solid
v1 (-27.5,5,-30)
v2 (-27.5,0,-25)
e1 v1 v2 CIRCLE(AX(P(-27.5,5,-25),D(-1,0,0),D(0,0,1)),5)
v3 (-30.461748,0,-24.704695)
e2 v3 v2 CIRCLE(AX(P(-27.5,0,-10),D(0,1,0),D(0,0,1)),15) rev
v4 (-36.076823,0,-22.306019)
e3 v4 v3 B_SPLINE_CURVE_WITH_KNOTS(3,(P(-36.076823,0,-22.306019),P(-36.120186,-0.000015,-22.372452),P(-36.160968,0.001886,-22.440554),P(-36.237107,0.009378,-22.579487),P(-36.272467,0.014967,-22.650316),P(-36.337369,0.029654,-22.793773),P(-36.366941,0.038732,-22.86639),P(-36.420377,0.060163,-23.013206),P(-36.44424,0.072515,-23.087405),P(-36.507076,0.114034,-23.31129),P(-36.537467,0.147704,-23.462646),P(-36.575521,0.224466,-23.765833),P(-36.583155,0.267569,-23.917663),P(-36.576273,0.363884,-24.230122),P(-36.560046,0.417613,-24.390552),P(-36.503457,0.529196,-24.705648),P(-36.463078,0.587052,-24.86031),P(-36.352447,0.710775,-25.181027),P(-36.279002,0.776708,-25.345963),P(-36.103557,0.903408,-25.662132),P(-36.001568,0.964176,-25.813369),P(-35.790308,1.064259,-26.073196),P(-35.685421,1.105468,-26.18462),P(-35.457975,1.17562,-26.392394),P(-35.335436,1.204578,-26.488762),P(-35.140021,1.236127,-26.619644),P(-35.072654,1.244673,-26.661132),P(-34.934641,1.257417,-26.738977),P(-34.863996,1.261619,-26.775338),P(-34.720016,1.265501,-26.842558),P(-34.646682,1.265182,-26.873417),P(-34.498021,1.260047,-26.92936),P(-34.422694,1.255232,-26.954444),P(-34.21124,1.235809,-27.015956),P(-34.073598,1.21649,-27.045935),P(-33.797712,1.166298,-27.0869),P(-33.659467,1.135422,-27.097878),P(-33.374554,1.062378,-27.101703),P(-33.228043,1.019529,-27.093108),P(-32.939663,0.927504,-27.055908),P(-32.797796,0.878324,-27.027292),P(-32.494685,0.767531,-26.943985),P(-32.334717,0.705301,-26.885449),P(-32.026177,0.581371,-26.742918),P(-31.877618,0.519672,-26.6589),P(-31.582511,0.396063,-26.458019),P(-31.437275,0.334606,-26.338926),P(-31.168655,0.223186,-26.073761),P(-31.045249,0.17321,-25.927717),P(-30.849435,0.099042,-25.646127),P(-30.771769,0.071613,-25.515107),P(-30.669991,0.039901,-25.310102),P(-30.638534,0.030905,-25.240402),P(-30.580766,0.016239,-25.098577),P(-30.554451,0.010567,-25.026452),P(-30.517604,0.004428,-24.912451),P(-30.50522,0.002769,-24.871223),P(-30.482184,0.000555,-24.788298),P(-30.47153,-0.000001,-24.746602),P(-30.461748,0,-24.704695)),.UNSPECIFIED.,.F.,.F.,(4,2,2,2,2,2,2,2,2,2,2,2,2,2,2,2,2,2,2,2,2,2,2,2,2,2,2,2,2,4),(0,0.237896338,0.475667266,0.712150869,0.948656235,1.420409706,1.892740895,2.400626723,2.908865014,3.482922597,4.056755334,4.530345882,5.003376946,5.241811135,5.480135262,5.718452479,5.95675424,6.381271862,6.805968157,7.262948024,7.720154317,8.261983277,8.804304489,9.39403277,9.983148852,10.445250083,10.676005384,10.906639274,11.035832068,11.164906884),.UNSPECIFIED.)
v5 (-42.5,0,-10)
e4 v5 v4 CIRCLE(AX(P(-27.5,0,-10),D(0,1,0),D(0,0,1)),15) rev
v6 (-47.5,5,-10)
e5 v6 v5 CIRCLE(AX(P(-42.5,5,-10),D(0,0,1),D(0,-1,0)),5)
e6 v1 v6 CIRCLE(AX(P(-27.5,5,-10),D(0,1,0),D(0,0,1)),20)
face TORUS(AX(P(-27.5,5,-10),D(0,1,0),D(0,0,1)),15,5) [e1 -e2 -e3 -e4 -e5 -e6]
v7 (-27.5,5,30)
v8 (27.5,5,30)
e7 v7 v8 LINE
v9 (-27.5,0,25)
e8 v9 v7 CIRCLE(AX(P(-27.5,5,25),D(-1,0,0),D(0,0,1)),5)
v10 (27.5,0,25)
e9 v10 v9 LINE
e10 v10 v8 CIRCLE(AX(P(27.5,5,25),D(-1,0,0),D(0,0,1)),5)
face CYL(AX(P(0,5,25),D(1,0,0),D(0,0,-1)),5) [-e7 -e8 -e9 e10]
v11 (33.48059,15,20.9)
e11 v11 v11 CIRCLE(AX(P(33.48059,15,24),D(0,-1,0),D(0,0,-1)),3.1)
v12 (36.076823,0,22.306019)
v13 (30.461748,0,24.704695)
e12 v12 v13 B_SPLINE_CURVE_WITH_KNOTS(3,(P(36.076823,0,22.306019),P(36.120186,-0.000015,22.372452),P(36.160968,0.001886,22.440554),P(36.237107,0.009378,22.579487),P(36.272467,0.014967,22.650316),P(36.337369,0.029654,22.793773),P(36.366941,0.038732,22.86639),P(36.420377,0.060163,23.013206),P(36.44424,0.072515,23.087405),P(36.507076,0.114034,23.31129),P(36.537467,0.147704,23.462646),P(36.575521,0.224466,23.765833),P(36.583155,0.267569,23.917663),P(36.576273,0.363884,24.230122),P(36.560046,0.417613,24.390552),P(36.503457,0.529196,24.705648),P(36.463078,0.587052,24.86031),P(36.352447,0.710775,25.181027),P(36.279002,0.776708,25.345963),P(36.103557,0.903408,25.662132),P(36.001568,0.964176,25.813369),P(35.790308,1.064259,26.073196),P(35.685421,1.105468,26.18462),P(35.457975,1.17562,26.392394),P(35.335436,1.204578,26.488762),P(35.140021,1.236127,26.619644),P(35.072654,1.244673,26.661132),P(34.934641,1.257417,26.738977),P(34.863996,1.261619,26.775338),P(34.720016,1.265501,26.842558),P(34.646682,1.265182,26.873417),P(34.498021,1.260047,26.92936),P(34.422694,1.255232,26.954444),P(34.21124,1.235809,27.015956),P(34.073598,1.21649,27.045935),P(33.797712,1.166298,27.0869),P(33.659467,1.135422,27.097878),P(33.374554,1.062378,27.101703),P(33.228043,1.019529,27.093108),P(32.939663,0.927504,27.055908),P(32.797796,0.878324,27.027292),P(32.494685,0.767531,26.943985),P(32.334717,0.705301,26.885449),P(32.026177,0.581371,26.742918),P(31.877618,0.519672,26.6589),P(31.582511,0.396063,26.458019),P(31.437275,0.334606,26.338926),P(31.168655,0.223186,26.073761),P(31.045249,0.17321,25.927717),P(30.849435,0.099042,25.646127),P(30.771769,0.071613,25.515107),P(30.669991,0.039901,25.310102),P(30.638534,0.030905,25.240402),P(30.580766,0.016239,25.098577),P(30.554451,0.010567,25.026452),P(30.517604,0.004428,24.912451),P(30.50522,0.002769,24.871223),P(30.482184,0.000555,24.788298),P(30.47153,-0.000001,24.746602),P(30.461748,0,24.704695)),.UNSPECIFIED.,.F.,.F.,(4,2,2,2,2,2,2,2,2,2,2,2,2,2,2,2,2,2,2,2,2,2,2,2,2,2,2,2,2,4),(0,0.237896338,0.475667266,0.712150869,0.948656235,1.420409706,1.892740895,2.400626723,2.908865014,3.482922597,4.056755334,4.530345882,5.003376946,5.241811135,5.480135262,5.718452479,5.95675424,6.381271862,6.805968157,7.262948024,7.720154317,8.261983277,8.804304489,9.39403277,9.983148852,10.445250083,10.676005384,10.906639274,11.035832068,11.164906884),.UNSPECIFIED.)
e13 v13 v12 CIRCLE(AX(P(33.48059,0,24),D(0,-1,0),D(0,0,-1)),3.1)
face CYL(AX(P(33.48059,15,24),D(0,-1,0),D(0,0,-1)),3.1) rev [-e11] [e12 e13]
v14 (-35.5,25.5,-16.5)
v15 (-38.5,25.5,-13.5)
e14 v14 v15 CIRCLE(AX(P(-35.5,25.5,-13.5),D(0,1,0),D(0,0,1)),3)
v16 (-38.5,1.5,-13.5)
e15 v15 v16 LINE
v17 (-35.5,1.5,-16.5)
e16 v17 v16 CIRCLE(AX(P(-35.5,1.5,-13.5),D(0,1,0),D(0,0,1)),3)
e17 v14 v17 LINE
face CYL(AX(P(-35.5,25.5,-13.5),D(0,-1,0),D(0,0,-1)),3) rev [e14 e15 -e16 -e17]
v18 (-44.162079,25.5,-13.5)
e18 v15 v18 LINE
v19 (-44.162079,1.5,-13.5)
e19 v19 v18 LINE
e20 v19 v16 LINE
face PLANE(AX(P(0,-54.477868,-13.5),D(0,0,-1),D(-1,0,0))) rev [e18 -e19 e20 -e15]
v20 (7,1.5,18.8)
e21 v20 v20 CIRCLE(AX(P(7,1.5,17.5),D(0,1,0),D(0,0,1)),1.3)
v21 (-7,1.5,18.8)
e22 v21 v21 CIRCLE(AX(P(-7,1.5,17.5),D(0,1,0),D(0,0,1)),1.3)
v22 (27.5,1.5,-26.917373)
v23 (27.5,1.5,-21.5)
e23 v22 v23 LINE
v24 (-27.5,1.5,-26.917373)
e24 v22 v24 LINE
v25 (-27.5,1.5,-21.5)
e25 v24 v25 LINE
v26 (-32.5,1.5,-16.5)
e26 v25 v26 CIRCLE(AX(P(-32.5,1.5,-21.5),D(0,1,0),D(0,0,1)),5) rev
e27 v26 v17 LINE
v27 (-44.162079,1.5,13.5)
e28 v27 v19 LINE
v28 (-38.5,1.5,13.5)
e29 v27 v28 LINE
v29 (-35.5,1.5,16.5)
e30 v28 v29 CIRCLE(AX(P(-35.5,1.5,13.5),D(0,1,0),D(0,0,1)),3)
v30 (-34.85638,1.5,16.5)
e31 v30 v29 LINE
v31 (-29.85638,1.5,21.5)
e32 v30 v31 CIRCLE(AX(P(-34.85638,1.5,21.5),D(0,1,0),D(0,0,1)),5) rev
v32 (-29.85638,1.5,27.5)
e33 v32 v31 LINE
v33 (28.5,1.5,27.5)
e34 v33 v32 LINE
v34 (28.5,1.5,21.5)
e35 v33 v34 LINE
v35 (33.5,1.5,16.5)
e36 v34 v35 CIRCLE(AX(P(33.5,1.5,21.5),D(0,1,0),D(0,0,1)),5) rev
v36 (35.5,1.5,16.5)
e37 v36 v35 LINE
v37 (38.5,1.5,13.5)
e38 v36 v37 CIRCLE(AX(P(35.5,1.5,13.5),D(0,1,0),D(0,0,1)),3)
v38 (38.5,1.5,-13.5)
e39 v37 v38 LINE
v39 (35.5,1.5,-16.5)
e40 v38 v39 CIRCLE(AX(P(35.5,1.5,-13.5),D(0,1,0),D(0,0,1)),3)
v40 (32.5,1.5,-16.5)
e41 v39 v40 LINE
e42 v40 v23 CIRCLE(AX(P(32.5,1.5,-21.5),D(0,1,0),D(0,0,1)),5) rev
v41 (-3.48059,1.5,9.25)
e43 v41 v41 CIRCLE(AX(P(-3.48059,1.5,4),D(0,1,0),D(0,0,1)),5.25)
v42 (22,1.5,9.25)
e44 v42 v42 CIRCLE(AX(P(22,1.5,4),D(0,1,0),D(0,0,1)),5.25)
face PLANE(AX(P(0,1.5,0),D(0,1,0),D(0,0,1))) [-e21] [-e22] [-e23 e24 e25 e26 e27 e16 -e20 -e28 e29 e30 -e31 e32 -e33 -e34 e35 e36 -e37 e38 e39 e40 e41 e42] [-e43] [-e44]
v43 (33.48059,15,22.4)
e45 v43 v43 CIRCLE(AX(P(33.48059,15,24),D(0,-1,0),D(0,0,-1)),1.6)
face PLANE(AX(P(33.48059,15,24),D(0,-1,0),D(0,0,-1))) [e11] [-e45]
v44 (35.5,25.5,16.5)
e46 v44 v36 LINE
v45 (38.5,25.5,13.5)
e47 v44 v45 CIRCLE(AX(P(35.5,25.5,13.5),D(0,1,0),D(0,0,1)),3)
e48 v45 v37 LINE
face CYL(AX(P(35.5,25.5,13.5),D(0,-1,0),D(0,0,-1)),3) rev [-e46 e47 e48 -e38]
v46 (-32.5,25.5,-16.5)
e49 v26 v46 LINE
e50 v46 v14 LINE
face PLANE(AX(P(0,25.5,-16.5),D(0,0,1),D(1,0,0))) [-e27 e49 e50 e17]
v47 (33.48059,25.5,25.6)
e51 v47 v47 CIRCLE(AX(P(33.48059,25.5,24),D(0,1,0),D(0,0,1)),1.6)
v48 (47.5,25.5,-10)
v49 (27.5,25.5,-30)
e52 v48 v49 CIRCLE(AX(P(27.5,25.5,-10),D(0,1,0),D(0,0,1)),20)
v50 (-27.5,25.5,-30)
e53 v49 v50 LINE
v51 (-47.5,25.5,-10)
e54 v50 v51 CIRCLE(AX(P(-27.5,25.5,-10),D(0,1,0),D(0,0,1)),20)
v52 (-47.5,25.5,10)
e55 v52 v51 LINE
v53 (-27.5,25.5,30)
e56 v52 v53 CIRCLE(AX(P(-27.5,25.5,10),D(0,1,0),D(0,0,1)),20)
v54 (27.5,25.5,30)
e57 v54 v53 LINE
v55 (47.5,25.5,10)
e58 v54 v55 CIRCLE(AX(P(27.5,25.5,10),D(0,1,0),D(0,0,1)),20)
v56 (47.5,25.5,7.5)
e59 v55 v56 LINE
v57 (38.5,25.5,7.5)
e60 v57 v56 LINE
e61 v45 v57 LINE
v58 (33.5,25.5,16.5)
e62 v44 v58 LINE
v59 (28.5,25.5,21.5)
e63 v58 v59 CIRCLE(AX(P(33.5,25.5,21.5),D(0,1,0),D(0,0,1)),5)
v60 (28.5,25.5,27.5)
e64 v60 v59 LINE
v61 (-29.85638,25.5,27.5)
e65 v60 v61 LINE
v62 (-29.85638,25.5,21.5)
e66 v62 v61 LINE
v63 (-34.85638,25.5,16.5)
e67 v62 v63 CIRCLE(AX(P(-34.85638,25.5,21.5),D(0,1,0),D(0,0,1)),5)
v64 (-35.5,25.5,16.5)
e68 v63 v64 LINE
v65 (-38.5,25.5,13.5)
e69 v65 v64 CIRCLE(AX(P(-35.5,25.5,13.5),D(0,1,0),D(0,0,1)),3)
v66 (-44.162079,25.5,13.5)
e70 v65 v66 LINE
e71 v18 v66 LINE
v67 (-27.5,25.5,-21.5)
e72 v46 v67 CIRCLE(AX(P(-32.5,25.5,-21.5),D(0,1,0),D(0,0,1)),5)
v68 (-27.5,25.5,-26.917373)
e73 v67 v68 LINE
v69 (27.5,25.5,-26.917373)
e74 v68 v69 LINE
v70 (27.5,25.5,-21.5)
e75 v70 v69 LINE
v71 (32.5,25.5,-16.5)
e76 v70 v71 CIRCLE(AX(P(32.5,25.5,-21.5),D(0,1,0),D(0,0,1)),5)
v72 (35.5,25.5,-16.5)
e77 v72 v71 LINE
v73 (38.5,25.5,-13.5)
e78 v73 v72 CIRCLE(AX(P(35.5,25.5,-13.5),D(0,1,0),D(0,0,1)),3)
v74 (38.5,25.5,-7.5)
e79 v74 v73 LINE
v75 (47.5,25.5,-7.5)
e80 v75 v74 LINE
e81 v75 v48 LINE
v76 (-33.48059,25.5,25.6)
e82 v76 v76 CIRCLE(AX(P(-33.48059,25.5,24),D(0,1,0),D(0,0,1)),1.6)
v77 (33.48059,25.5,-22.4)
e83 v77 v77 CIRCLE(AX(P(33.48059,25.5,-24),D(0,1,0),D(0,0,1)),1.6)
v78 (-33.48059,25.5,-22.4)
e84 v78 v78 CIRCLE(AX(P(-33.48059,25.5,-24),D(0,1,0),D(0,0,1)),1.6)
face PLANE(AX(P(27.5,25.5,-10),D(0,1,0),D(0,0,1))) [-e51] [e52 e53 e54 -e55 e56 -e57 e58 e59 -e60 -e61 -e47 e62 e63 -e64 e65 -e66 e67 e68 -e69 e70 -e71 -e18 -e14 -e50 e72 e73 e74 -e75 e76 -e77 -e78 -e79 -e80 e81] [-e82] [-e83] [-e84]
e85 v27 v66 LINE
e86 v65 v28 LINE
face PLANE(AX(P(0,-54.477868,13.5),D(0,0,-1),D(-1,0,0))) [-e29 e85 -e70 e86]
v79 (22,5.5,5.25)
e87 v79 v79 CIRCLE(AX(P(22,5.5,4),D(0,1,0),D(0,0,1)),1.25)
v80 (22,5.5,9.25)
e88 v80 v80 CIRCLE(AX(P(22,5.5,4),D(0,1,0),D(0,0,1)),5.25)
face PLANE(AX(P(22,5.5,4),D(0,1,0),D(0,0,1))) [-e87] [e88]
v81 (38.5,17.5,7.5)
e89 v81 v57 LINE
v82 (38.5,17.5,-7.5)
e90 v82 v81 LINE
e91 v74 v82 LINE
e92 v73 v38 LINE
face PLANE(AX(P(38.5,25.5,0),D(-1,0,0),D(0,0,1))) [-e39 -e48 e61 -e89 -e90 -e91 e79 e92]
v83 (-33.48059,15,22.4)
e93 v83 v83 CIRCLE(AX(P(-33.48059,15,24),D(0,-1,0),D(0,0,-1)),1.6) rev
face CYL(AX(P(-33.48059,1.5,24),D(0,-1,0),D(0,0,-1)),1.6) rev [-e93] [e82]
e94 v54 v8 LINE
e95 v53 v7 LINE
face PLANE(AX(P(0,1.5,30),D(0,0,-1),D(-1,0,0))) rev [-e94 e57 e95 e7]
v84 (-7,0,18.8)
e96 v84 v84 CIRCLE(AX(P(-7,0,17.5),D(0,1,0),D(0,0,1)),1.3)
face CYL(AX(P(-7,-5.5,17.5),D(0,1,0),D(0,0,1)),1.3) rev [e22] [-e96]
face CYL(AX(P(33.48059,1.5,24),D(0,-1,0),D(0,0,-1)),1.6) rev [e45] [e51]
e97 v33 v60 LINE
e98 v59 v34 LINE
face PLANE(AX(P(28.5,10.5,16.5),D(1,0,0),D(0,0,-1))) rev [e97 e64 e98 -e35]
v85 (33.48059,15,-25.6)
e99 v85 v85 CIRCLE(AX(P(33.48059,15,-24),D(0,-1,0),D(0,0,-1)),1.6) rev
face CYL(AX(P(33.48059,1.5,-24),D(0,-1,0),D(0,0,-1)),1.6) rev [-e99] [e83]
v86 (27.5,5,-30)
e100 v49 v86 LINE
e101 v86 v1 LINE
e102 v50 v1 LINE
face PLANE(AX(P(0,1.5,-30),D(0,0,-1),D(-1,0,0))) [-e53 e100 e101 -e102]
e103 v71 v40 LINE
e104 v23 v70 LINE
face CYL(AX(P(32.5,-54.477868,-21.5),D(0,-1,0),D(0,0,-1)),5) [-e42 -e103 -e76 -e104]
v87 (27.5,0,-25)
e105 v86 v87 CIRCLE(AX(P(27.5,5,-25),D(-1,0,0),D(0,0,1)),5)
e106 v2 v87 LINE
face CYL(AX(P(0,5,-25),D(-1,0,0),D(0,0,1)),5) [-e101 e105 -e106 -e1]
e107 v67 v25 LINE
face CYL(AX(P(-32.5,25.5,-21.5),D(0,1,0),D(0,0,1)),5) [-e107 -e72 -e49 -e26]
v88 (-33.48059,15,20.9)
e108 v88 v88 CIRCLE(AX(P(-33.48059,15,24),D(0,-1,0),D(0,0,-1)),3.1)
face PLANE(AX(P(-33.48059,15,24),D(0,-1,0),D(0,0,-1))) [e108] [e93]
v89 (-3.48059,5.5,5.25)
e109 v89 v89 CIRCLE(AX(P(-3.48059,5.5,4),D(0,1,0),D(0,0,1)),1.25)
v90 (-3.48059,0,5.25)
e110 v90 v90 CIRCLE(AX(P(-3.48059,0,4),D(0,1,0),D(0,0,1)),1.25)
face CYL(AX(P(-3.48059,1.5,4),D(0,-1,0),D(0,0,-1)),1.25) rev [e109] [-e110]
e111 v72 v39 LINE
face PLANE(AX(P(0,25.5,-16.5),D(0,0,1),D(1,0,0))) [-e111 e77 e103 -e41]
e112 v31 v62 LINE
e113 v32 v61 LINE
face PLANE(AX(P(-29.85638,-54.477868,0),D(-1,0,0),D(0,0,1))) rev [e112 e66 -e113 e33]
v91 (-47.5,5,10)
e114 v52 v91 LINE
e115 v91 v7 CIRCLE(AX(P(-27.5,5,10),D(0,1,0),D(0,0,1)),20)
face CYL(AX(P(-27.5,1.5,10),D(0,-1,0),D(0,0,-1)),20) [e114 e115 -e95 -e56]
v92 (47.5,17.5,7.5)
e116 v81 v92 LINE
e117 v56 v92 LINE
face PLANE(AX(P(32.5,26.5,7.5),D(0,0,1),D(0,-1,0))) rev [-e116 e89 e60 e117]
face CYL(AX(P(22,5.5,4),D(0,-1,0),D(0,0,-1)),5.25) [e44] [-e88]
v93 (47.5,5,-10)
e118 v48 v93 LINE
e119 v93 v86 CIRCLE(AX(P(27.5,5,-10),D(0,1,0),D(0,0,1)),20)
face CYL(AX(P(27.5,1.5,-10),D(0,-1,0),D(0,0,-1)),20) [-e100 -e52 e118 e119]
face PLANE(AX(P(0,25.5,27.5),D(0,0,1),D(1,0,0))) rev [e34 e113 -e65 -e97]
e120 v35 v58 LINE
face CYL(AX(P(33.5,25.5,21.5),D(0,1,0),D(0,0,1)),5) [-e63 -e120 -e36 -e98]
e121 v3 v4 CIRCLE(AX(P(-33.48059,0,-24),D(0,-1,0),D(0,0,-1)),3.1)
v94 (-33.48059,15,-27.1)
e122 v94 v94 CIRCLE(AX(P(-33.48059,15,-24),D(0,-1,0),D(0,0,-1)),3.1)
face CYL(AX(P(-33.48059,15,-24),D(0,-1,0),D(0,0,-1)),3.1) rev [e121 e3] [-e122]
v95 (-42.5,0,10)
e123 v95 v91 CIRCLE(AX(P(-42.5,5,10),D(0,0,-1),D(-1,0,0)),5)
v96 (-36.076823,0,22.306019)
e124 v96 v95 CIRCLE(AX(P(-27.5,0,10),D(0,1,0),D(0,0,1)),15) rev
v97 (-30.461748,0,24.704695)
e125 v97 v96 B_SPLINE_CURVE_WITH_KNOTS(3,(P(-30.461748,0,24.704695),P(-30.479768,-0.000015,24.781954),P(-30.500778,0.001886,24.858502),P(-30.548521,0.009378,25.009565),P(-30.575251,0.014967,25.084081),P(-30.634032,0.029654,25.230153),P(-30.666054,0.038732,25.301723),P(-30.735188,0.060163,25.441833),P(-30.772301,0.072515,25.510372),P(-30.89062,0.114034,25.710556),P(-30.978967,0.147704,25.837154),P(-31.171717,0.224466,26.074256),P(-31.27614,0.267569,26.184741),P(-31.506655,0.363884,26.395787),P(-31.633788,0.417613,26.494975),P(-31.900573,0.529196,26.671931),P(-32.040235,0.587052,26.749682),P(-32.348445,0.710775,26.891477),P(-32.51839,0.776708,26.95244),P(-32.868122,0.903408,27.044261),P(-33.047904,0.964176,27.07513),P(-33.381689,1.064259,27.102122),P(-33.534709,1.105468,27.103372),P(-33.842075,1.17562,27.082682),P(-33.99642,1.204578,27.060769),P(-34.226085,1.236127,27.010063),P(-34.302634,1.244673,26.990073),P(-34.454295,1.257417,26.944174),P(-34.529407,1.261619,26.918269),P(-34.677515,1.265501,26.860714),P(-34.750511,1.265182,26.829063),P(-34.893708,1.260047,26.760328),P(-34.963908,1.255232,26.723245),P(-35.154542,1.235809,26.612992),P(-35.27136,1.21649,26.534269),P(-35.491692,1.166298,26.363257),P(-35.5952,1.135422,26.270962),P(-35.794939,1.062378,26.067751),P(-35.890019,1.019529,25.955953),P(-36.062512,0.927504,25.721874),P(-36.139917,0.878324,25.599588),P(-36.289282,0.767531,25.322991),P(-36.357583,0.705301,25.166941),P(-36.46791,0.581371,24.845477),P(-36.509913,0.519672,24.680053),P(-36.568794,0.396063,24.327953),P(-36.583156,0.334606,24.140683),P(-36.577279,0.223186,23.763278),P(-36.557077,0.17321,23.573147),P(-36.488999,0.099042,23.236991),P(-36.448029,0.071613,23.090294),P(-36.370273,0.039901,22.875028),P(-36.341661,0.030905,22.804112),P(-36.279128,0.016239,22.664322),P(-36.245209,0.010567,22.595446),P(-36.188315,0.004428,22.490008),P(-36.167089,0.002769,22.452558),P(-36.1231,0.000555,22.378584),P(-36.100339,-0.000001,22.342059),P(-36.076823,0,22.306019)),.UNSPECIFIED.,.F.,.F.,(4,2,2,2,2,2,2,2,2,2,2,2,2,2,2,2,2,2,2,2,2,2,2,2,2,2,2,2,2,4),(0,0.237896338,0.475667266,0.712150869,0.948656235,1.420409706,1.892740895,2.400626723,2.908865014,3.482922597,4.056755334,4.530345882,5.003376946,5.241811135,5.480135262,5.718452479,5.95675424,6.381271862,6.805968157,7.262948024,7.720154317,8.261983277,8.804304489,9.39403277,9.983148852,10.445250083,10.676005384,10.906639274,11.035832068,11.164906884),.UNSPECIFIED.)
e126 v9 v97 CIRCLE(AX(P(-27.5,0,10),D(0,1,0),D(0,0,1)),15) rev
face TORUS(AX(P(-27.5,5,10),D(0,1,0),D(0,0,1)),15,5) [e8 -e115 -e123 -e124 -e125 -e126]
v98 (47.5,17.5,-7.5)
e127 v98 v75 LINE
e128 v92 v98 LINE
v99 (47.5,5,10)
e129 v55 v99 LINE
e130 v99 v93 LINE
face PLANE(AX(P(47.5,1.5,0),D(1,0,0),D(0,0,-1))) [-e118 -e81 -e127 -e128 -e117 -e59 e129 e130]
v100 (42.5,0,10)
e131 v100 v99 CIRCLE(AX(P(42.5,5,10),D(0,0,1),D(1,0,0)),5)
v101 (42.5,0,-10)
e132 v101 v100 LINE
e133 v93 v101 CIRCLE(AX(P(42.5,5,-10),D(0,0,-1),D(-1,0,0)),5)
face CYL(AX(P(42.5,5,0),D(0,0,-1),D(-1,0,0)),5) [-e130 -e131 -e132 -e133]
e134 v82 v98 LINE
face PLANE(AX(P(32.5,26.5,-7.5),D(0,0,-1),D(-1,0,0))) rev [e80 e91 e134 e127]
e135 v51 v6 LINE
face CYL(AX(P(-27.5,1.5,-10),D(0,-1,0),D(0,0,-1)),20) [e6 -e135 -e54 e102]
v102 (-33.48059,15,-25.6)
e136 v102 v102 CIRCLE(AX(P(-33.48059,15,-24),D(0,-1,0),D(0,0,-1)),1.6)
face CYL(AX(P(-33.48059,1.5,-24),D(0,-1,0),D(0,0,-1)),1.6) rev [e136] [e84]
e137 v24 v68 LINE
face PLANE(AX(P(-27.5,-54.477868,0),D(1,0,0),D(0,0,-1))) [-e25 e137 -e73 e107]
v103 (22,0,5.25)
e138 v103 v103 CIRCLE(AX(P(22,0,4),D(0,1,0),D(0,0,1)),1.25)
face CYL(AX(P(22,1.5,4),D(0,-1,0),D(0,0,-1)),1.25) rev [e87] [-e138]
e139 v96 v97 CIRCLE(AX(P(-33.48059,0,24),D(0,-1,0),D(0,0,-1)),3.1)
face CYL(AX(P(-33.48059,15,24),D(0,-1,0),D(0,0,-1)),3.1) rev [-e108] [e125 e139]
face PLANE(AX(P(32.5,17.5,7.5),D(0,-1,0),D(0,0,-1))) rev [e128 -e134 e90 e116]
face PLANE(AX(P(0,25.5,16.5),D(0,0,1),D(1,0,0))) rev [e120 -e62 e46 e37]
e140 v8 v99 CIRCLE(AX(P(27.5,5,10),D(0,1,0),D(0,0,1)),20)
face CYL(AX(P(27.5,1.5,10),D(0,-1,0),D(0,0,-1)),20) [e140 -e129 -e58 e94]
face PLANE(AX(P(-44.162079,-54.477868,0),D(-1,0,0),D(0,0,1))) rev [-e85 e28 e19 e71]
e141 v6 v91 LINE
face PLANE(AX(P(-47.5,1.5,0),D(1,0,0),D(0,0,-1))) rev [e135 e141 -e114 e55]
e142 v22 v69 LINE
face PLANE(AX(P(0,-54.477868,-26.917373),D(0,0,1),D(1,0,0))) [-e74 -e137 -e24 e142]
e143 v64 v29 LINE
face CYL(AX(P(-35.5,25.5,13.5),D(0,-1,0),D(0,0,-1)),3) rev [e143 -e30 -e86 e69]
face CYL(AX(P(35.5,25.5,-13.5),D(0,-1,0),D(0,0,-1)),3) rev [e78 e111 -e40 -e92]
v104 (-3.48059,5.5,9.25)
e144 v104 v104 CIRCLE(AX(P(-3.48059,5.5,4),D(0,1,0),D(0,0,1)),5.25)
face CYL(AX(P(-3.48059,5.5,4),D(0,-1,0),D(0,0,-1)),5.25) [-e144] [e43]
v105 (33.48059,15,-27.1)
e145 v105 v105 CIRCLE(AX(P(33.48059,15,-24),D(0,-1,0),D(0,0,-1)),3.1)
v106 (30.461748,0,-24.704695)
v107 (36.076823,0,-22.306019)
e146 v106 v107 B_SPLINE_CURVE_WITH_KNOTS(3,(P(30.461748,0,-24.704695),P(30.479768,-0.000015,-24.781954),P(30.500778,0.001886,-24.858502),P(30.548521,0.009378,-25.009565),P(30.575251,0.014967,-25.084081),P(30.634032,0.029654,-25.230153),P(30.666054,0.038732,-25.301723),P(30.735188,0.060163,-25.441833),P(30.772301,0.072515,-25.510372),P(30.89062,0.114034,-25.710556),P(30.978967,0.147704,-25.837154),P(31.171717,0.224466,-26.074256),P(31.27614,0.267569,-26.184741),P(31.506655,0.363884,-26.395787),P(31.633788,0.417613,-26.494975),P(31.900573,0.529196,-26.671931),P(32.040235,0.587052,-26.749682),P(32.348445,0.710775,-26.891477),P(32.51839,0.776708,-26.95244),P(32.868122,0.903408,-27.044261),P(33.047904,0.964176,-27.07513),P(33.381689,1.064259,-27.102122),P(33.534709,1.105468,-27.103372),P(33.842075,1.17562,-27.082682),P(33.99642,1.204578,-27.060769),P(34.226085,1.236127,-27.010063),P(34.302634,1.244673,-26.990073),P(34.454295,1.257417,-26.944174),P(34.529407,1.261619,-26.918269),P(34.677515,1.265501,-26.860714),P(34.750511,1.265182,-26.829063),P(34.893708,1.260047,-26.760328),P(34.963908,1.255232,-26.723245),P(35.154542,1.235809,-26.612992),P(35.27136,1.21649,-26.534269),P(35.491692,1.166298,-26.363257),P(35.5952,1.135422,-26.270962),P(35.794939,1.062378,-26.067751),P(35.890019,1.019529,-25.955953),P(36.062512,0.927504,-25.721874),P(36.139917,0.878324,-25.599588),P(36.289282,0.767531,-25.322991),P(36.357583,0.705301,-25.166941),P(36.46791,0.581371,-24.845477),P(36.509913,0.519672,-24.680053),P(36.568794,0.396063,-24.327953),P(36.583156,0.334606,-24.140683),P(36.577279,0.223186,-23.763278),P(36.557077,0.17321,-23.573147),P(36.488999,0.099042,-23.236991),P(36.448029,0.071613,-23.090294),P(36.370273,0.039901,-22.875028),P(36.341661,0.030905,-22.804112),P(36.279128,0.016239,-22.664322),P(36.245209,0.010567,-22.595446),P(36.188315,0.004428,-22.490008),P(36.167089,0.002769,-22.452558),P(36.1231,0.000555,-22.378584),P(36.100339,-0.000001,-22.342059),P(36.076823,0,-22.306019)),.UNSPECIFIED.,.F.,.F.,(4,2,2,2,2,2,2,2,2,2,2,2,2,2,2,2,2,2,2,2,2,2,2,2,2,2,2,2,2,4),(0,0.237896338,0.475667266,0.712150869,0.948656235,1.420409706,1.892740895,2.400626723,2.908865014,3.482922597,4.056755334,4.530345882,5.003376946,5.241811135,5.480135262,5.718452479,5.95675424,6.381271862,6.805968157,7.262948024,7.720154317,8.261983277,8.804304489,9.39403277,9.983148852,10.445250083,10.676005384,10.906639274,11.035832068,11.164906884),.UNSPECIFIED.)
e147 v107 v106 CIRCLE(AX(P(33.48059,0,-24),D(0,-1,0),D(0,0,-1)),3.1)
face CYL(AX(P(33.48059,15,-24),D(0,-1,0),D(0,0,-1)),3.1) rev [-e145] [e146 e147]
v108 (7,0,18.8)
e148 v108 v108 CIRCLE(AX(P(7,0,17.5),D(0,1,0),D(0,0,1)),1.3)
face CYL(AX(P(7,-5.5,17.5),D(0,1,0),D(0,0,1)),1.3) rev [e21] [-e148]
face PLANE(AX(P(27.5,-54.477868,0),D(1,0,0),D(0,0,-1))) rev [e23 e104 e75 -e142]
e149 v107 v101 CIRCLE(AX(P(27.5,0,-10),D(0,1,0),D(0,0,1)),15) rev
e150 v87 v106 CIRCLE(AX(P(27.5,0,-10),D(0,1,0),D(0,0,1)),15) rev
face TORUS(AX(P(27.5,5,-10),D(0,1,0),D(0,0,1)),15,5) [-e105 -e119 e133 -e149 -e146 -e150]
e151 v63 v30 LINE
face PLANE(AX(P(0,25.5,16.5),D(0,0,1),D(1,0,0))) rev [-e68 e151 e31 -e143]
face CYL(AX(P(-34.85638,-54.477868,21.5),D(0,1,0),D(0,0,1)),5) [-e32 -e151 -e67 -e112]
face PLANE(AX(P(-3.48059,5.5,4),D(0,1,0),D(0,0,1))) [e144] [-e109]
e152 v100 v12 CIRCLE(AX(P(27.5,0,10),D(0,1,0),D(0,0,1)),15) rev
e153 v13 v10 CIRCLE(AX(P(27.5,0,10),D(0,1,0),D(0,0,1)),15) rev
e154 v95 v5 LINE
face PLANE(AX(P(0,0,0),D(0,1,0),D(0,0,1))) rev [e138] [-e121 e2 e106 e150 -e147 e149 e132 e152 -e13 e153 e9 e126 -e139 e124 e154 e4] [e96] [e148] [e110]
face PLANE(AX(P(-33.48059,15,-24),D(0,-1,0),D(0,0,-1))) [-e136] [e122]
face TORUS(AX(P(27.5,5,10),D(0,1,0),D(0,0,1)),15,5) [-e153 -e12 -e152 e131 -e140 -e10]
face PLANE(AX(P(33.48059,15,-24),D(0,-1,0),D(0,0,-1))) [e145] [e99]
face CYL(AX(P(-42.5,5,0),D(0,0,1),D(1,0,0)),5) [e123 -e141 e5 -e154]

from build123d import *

# Parameters (mm, degrees)
SKETCH2_R           = 1.6
SKETCH2_W           = 24
SKETCH2_H           = 11
SKETCH2_H_2         = 3
SKETCH2_R_2         = 1.25
BOSS_EXTRUDE1_DEPTH = 1.5
BOSS_EXTRUDE2_START = 1.5
SKETCH2_3_R         = 1.6
BOSS_EXTRUDE2_DEPTH = 24
SKETCH3_R           = 5.25
SKETCH3_R_2         = 1.25
BOSS_EXTRUDE3_DEPTH = 4
FILLET1_R           = 10
SKETCH4_R           = 1.3
CUT_EXTRUDE1_DEPTH  = 7
SKETCH5_R           = 3.1
CUT_EXTRUDE2_DEPTH  = 15
FILLET2_R           = 5
SKETCH6_W           = 15
SKETCH6_H           = 9
CUT_EXTRUDE3_DEPTH  = 15
SKETCH7_W           = 12
SKETCH7_H           = 6
CUT_EXTRUDE4_DEPTH  = 15
SKETCH10_W          = 5.662079196
SKETCH10_H          = 27
SKETCH10_W_2        = 55
SKETCH10_H_2        = 10.417373492
CUT_EXTRUDE5_DEPTH  = 24
FILLET6_R           = 5


with BuildPart() as part:
    # Sketch2 → Boss-Extrude1 (new body)
    # profile 1 of 4: a face of its own
    with BuildSketch(Plane(origin=(0, 0, 0), x_dir=(1, 0, 0), z_dir=(0, 1, 0))):
        with BuildLine():
            Line((27.5, 30), (-27.5, 30))
            ThreePointArc((-27.5, 30), (-41.642135624, 24.142135624), (-47.5, 10))
            Line((-47.5, 10), (-47.5, -10))
            ThreePointArc((-47.5, -10), (-41.642135624, -24.142135624), (-27.5, -30))
            Line((-27.5, -30), (27.5, -30))
            ThreePointArc((27.5, -30), (41.642135624, -24.142135624), (47.5, -10))
            Line((47.5, -10), (47.5, 10))
            ThreePointArc((47.5, 10), (41.642135624, 24.142135624), (27.5, 30))
        make_face()
        with Locations(Location((-33.480589606, -24, 0), (0, 0, 270))):
            Circle(SKETCH2_R, mode=Mode.SUBTRACT)
        with Locations(Location((33.480589606, -24, 0), (0, 0, 270))):
            Circle(SKETCH2_R, mode=Mode.SUBTRACT)
        with BuildLine():
            ThreePointArc((-38.5, 13.5), (-37.621320344, 15.621320344), (-35.5, 16.5))
            Line((-35.5, 16.5), (35.5, 16.5))
            ThreePointArc((35.5, 16.5), (37.621320344, 15.621320344), (38.5, 13.5))
            Line((38.5, 13.5), (38.5, -13.5))
            ThreePointArc((38.5, -13.5), (37.621320344, -15.621320344), (35.5, -16.5))
            Line((35.5, -16.5), (12, -16.5))
            Line((12, -16.5), (12, -27.5))
            Line((12, -27.5), (-12, -27.5))
            Line((-12, -27.5), (-12, -16.5))
            Line((-12, -16.5), (-35.5, -16.5))
            ThreePointArc((-35.5, -16.5), (-37.621320344, -15.621320344), (-38.5, -13.5))
            Line((-38.5, -13.5), (-38.5, 13.5))
        make_face(mode=Mode.SUBTRACT)
        with Locations(Location((-33.480589606, 24, 0), (0, 0, 270))):
            Circle(SKETCH2_R, mode=Mode.SUBTRACT)
        with Locations(Location((33.480589606, 24, 0), (0, 0, 270))):
            Circle(SKETCH2_R, mode=Mode.SUBTRACT)
    # profile 2 of 4: a face of its own
    with BuildSketch(Plane(origin=(0, 0, 0), x_dir=(1, 0, 0), z_dir=(0, 1, 0))):
        with Locations((0, -22)):
            Rectangle(SKETCH2_W, SKETCH2_H)
    # profile 3 of 4: a face of its own
    with BuildSketch(Plane(origin=(0, 0, 0), x_dir=(1, 0, 0), z_dir=(0, 1, 0))):
        with Locations((0, -15)):
            Rectangle(SKETCH2_W, SKETCH2_H_2)
    # profile 4 of 4: a face of its own
    with BuildSketch(Plane(origin=(0, 0, 0), x_dir=(1, 0, 0), z_dir=(0, 1, 0))):
        with BuildLine():
            Line((35.5, 16.5), (-35.5, 16.5))
            ThreePointArc((-35.5, 16.5), (-37.621320344, 15.621320344), (-38.5, 13.5))
            Line((-38.5, 13.5), (-38.5, -13.5))
            ThreePointArc((-38.5, -13.5), (-37.621320344, -15.621320344), (-35.5, -16.5))
            Line((-35.5, -16.5), (-12, -16.5))
            Line((-12, -16.5), (-12, -13.5))
            Line((-12, -13.5), (12, -13.5))
            Line((12, -13.5), (12, -16.5))
            Line((12, -16.5), (35.5, -16.5))
            ThreePointArc((35.5, -16.5), (37.621320344, -15.621320344), (38.5, -13.5))
            Line((38.5, -13.5), (38.5, 13.5))
            ThreePointArc((38.5, 13.5), (37.621320344, 15.621320344), (35.5, 16.5))
        make_face()
        with Locations(Location((-3.480589606, -4, 0), (0, 0, 270))):
            Circle(SKETCH2_R_2, mode=Mode.SUBTRACT)
        with Locations(Location((22, -4, 0), (0, 0, 270))):
            Circle(SKETCH2_R_2, mode=Mode.SUBTRACT)
    extrude(amount=BOSS_EXTRUDE1_DEPTH)

    # Sketch2<3> → Boss-Extrude2 (add)
    with BuildSketch(Plane(origin=(0, 0, 0), x_dir=(1, 0, 0), z_dir=(0, 1, 0)).offset(BOSS_EXTRUDE2_START)):
        with BuildLine():
            Line((27.5, 30), (-27.5, 30))
            ThreePointArc((-27.5, 30), (-41.642135624, 24.142135624), (-47.5, 10))
            Line((-47.5, 10), (-47.5, -10))
            ThreePointArc((-47.5, -10), (-41.642135624, -24.142135624), (-27.5, -30))
            Line((-27.5, -30), (27.5, -30))
            ThreePointArc((27.5, -30), (41.642135624, -24.142135624), (47.5, -10))
            Line((47.5, -10), (47.5, 10))
            ThreePointArc((47.5, 10), (41.642135624, 24.142135624), (27.5, 30))
        make_face()
        with Locations(Location((-33.480589606, -24, 0), (0, 0, 270))):
            Circle(SKETCH2_3_R, mode=Mode.SUBTRACT)
        with Locations(Location((33.480589606, -24, 0), (0, 0, 270))):
            Circle(SKETCH2_3_R, mode=Mode.SUBTRACT)
        with BuildLine():
            ThreePointArc((-38.5, 13.5), (-37.621320344, 15.621320344), (-35.5, 16.5))
            Line((-35.5, 16.5), (35.5, 16.5))
            ThreePointArc((35.5, 16.5), (37.621320344, 15.621320344), (38.5, 13.5))
            Line((38.5, 13.5), (38.5, -13.5))
            ThreePointArc((38.5, -13.5), (37.621320344, -15.621320344), (35.5, -16.5))
            Line((35.5, -16.5), (12, -16.5))
            Line((12, -16.5), (12, -27.5))
            Line((12, -27.5), (-12, -27.5))
            Line((-12, -27.5), (-12, -16.5))
            Line((-12, -16.5), (-35.5, -16.5))
            ThreePointArc((-35.5, -16.5), (-37.621320344, -15.621320344), (-38.5, -13.5))
            Line((-38.5, -13.5), (-38.5, 13.5))
        make_face(mode=Mode.SUBTRACT)
        with Locations(Location((-33.480589606, 24, 0), (0, 0, 270))):
            Circle(SKETCH2_3_R, mode=Mode.SUBTRACT)
        with Locations(Location((33.480589606, 24, 0), (0, 0, 270))):
            Circle(SKETCH2_3_R, mode=Mode.SUBTRACT)
    extrude(amount=BOSS_EXTRUDE2_DEPTH)

    # Sketch3 → Boss-Extrude3 (add)
    # profile 1 of 2: a face of its own
    with BuildSketch(Plane(origin=(0, 1.5, 0), x_dir=(1, 0, 0), z_dir=(0, 1, 0))):
        with Locations(Location((-3.480589606, -4, 0), (0, 0, 270))):
            Circle(SKETCH3_R)
        with Locations(Location((-3.480589606, -4, 0), (0, 0, 270))):
            Circle(SKETCH3_R_2, mode=Mode.SUBTRACT)
    # profile 2 of 2: a face of its own
    with BuildSketch(Plane(origin=(0, 1.5, 0), x_dir=(1, 0, 0), z_dir=(0, 1, 0))):
        with Locations(Location((22, -4, 0), (0, 0, 270))):
            Circle(SKETCH3_R)
        with Locations(Location((22, -4, 0), (0, 0, 270))):
            Circle(SKETCH3_R_2, mode=Mode.SUBTRACT)
    extrude(amount=BOSS_EXTRUDE3_DEPTH)

    # Fillet1
    fillet1_edges = [part.edges().sort_by_distance(p)[0] for p in [
        (-12, 13.5, 16.5),
        (12, 13.5, 16.5),
    ]]
    fillet(fillet1_edges, radius=FILLET1_R)

    # Sketch4 → Cut-Extrude1 (cut)
    with BuildSketch(Plane(origin=(0, 1.5, 0), x_dir=(1, 0, 0), z_dir=(0, 1, 0))):
        with Locations(Location((-7, -17.5, 0), (0, 0, 270))):
            Circle(SKETCH4_R)
        with Locations(Location((7, -17.5, 0), (0, 0, 270))):
            Circle(SKETCH4_R)
    extrude(amount=-CUT_EXTRUDE1_DEPTH, mode=Mode.SUBTRACT)

    # Sketch5 → Cut-Extrude2 (cut)
    with BuildSketch(Plane.XZ):
        with Locations(Location((-33.480589606, 24, 0), (0, 0, 270))):
            Circle(SKETCH5_R)
        with Locations(Location((-33.480589606, -24, 0), (0, 0, 270))):
            Circle(SKETCH5_R)
        with Locations(Location((33.480589606, -24, 0), (0, 0, 270))):
            Circle(SKETCH5_R)
        with Locations(Location((33.480589606, 24, 0), (0, 0, 270))):
            Circle(SKETCH5_R)
    extrude(amount=-CUT_EXTRUDE2_DEPTH, mode=Mode.SUBTRACT)

    # Fillet2
    # the kernel refuses this fillet: 5 mm, written as the material it takes off along each edge
    with BuildSketch(Plane(origin=(27.5, 0, -10), x_dir=(1, 0, 0), z_dir=(0, 0, 1))) as fillet2_piece_1:
        with BuildLine():
            CenterArc((20 - FILLET2_R, FILLET2_R), FILLET2_R, 270, 90)
            Line((20, FILLET2_R), (20, 0))
            Line((20, 0), (20 - FILLET2_R, 0))
        make_face()
    revolve(axis=Axis((27.5, 0, -10), (0, 1, 0)), revolution_arc=90, mode=Mode.SUBTRACT)
    with BuildSketch(Plane(origin=(47.5, 0, 10), x_dir=(-1, 0, 0), z_dir=(0, 0, -1)), Plane(origin=(-47.5, 0, -10), x_dir=(1, 0, 0), z_dir=(0, 0, 1))) as fillet2_piece_2:
        with BuildLine():
            CenterArc((FILLET2_R, FILLET2_R), FILLET2_R, 180, 90)
            Line((0, FILLET2_R), (0, 0))
            Line((0, 0), (FILLET2_R, 0))
        make_face()
    extrude(amount=20, mode=Mode.SUBTRACT)
    with BuildSketch(Plane(origin=(27.5, 0, 10), x_dir=(0, 0, 1), z_dir=(-1, 0, 0))) as fillet2_piece_3:
        with BuildLine():
            CenterArc((20 - FILLET2_R, FILLET2_R), FILLET2_R, 270, 90)
            Line((20, FILLET2_R), (20, 0))
            Line((20, 0), (20 - FILLET2_R, 0))
        make_face()
    revolve(axis=Axis((27.5, 0, 10), (0, 1, 0)), revolution_arc=90, mode=Mode.SUBTRACT)
    with BuildSketch(Plane(origin=(-27.5, 0, 30), x_dir=(0, 0, -1), z_dir=(1, 0, 0)), Plane(origin=(27.5, 0, -30), x_dir=(0, 0, 1), z_dir=(-1, 0, 0))) as fillet2_piece_4:
        with BuildLine():
            CenterArc((FILLET2_R, FILLET2_R), FILLET2_R, 180, 90)
            Line((0, FILLET2_R), (0, 0))
            Line((0, 0), (FILLET2_R, 0))
        make_face()
    extrude(amount=55, mode=Mode.SUBTRACT)
    with BuildSketch(Plane(origin=(-27.5, 0, 10), x_dir=(-1, 0, 0), z_dir=(0, 0, -1))) as fillet2_piece_5:
        with BuildLine():
            CenterArc((20 - FILLET2_R, FILLET2_R), FILLET2_R, 270, 90)
            Line((20, FILLET2_R), (20, 0))
            Line((20, 0), (20 - FILLET2_R, 0))
        make_face()
    revolve(axis=Axis((-27.5, 0, 10), (0, 1, 0)), revolution_arc=90, mode=Mode.SUBTRACT)
    with BuildSketch(Plane(origin=(-27.5, 0, -10), x_dir=(0, 0, -1), z_dir=(1, 0, 0))) as fillet2_piece_6:
        with BuildLine():
            CenterArc((20 - FILLET2_R, FILLET2_R), FILLET2_R, 270, 90)
            Line((20, FILLET2_R), (20, 0))
            Line((20, 0), (20 - FILLET2_R, 0))
        make_face()
    revolve(axis=Axis((-27.5, 0, -10), (0, 1, 0)), revolution_arc=90, mode=Mode.SUBTRACT)

    # Sketch6 → Cut-Extrude3 (cut)
    with BuildSketch(Plane(origin=(47.5, 0, 0), x_dir=(0, 0, -1), z_dir=(1, 0, 0))):
        with Locations((0, 22)):
            Rectangle(SKETCH6_W, SKETCH6_H)
    extrude(amount=-CUT_EXTRUDE3_DEPTH, mode=Mode.SUBTRACT)

    # Sketch7 → Cut-Extrude4 (cut)
    with BuildSketch(Plane(origin=(0, 25.5, 0), x_dir=(1, 0, 0), z_dir=(0, 1, 0))):
        with Locations((22.5, -19.5)):
            Rectangle(SKETCH7_W, SKETCH7_H)
    extrude(amount=-CUT_EXTRUDE4_DEPTH, mode=Mode.SUBTRACT)

    # Sketch10 → Cut-Extrude5 (cut)
    with BuildSketch(Plane(origin=(0, 25.5, 0), x_dir=(1, 0, 0), z_dir=(0, 1, 0))):
        with Locations((-41.331039598, 0)):
            Rectangle(SKETCH10_W, SKETCH10_H)
        with Locations((0, 21.708686746)):
            Rectangle(SKETCH10_W_2, SKETCH10_H_2)
        with BuildLine():
            Line((-22, -16.5), (-29.856380317, -16.5))
            Line((-29.856380317, -16.5), (-29.856380317, -27.5))
            Line((-29.856380317, -27.5), (-12, -27.5))
            Line((-12, -27.5), (-12, -26.5))
            ThreePointArc((-12, -26.5), (-14.928932188, -19.428932188), (-22, -16.5))
        make_face()
        with BuildLine():
            Line((-12, -16.5), (-22, -16.5))
            ThreePointArc((-22, -16.5), (-14.928932188, -19.428932188), (-12, -26.5))
            Line((-12, -26.5), (-12, -16.5))
        make_face()
        with BuildLine():
            Line((12, -16.5), (12, -26.5))
            ThreePointArc((12, -26.5), (13.196591569, -21.75658351), (16.5, -18.148353456))
            Line((16.5, -18.148353456), (16.5, -22.5))
            Line((16.5, -22.5), (28.5, -22.5))
            Line((28.5, -22.5), (28.5, -16.5))
            Line((28.5, -16.5), (12, -16.5))
        make_face()
        with BuildLine():
            Line((12, -26.5), (12, -27.5))
            Line((12, -27.5), (28.5, -27.5))
            Line((28.5, -27.5), (28.5, -22.5))
            Line((28.5, -22.5), (16.5, -22.5))
            Line((16.5, -22.5), (16.5, -18.148353456))
            ThreePointArc((16.5, -18.148353456), (13.196591569, -21.75658351), (12, -26.5))
        make_face()
    extrude(amount=-CUT_EXTRUDE5_DEPTH, mode=Mode.SUBTRACT)

    # Fillet6
    fillet6_edges = [part.edges().sort_by_distance(p)[0] for p in [
        (28.5, 13.5, 16.5),
        (-29.856380317, 13.5, 16.5),
        (27.5, 13.5, -16.5),
        (-27.5, 13.5, -16.5),
    ]]
    fillet(fillet6_edges, radius=FILLET6_R)


solid = part.part
